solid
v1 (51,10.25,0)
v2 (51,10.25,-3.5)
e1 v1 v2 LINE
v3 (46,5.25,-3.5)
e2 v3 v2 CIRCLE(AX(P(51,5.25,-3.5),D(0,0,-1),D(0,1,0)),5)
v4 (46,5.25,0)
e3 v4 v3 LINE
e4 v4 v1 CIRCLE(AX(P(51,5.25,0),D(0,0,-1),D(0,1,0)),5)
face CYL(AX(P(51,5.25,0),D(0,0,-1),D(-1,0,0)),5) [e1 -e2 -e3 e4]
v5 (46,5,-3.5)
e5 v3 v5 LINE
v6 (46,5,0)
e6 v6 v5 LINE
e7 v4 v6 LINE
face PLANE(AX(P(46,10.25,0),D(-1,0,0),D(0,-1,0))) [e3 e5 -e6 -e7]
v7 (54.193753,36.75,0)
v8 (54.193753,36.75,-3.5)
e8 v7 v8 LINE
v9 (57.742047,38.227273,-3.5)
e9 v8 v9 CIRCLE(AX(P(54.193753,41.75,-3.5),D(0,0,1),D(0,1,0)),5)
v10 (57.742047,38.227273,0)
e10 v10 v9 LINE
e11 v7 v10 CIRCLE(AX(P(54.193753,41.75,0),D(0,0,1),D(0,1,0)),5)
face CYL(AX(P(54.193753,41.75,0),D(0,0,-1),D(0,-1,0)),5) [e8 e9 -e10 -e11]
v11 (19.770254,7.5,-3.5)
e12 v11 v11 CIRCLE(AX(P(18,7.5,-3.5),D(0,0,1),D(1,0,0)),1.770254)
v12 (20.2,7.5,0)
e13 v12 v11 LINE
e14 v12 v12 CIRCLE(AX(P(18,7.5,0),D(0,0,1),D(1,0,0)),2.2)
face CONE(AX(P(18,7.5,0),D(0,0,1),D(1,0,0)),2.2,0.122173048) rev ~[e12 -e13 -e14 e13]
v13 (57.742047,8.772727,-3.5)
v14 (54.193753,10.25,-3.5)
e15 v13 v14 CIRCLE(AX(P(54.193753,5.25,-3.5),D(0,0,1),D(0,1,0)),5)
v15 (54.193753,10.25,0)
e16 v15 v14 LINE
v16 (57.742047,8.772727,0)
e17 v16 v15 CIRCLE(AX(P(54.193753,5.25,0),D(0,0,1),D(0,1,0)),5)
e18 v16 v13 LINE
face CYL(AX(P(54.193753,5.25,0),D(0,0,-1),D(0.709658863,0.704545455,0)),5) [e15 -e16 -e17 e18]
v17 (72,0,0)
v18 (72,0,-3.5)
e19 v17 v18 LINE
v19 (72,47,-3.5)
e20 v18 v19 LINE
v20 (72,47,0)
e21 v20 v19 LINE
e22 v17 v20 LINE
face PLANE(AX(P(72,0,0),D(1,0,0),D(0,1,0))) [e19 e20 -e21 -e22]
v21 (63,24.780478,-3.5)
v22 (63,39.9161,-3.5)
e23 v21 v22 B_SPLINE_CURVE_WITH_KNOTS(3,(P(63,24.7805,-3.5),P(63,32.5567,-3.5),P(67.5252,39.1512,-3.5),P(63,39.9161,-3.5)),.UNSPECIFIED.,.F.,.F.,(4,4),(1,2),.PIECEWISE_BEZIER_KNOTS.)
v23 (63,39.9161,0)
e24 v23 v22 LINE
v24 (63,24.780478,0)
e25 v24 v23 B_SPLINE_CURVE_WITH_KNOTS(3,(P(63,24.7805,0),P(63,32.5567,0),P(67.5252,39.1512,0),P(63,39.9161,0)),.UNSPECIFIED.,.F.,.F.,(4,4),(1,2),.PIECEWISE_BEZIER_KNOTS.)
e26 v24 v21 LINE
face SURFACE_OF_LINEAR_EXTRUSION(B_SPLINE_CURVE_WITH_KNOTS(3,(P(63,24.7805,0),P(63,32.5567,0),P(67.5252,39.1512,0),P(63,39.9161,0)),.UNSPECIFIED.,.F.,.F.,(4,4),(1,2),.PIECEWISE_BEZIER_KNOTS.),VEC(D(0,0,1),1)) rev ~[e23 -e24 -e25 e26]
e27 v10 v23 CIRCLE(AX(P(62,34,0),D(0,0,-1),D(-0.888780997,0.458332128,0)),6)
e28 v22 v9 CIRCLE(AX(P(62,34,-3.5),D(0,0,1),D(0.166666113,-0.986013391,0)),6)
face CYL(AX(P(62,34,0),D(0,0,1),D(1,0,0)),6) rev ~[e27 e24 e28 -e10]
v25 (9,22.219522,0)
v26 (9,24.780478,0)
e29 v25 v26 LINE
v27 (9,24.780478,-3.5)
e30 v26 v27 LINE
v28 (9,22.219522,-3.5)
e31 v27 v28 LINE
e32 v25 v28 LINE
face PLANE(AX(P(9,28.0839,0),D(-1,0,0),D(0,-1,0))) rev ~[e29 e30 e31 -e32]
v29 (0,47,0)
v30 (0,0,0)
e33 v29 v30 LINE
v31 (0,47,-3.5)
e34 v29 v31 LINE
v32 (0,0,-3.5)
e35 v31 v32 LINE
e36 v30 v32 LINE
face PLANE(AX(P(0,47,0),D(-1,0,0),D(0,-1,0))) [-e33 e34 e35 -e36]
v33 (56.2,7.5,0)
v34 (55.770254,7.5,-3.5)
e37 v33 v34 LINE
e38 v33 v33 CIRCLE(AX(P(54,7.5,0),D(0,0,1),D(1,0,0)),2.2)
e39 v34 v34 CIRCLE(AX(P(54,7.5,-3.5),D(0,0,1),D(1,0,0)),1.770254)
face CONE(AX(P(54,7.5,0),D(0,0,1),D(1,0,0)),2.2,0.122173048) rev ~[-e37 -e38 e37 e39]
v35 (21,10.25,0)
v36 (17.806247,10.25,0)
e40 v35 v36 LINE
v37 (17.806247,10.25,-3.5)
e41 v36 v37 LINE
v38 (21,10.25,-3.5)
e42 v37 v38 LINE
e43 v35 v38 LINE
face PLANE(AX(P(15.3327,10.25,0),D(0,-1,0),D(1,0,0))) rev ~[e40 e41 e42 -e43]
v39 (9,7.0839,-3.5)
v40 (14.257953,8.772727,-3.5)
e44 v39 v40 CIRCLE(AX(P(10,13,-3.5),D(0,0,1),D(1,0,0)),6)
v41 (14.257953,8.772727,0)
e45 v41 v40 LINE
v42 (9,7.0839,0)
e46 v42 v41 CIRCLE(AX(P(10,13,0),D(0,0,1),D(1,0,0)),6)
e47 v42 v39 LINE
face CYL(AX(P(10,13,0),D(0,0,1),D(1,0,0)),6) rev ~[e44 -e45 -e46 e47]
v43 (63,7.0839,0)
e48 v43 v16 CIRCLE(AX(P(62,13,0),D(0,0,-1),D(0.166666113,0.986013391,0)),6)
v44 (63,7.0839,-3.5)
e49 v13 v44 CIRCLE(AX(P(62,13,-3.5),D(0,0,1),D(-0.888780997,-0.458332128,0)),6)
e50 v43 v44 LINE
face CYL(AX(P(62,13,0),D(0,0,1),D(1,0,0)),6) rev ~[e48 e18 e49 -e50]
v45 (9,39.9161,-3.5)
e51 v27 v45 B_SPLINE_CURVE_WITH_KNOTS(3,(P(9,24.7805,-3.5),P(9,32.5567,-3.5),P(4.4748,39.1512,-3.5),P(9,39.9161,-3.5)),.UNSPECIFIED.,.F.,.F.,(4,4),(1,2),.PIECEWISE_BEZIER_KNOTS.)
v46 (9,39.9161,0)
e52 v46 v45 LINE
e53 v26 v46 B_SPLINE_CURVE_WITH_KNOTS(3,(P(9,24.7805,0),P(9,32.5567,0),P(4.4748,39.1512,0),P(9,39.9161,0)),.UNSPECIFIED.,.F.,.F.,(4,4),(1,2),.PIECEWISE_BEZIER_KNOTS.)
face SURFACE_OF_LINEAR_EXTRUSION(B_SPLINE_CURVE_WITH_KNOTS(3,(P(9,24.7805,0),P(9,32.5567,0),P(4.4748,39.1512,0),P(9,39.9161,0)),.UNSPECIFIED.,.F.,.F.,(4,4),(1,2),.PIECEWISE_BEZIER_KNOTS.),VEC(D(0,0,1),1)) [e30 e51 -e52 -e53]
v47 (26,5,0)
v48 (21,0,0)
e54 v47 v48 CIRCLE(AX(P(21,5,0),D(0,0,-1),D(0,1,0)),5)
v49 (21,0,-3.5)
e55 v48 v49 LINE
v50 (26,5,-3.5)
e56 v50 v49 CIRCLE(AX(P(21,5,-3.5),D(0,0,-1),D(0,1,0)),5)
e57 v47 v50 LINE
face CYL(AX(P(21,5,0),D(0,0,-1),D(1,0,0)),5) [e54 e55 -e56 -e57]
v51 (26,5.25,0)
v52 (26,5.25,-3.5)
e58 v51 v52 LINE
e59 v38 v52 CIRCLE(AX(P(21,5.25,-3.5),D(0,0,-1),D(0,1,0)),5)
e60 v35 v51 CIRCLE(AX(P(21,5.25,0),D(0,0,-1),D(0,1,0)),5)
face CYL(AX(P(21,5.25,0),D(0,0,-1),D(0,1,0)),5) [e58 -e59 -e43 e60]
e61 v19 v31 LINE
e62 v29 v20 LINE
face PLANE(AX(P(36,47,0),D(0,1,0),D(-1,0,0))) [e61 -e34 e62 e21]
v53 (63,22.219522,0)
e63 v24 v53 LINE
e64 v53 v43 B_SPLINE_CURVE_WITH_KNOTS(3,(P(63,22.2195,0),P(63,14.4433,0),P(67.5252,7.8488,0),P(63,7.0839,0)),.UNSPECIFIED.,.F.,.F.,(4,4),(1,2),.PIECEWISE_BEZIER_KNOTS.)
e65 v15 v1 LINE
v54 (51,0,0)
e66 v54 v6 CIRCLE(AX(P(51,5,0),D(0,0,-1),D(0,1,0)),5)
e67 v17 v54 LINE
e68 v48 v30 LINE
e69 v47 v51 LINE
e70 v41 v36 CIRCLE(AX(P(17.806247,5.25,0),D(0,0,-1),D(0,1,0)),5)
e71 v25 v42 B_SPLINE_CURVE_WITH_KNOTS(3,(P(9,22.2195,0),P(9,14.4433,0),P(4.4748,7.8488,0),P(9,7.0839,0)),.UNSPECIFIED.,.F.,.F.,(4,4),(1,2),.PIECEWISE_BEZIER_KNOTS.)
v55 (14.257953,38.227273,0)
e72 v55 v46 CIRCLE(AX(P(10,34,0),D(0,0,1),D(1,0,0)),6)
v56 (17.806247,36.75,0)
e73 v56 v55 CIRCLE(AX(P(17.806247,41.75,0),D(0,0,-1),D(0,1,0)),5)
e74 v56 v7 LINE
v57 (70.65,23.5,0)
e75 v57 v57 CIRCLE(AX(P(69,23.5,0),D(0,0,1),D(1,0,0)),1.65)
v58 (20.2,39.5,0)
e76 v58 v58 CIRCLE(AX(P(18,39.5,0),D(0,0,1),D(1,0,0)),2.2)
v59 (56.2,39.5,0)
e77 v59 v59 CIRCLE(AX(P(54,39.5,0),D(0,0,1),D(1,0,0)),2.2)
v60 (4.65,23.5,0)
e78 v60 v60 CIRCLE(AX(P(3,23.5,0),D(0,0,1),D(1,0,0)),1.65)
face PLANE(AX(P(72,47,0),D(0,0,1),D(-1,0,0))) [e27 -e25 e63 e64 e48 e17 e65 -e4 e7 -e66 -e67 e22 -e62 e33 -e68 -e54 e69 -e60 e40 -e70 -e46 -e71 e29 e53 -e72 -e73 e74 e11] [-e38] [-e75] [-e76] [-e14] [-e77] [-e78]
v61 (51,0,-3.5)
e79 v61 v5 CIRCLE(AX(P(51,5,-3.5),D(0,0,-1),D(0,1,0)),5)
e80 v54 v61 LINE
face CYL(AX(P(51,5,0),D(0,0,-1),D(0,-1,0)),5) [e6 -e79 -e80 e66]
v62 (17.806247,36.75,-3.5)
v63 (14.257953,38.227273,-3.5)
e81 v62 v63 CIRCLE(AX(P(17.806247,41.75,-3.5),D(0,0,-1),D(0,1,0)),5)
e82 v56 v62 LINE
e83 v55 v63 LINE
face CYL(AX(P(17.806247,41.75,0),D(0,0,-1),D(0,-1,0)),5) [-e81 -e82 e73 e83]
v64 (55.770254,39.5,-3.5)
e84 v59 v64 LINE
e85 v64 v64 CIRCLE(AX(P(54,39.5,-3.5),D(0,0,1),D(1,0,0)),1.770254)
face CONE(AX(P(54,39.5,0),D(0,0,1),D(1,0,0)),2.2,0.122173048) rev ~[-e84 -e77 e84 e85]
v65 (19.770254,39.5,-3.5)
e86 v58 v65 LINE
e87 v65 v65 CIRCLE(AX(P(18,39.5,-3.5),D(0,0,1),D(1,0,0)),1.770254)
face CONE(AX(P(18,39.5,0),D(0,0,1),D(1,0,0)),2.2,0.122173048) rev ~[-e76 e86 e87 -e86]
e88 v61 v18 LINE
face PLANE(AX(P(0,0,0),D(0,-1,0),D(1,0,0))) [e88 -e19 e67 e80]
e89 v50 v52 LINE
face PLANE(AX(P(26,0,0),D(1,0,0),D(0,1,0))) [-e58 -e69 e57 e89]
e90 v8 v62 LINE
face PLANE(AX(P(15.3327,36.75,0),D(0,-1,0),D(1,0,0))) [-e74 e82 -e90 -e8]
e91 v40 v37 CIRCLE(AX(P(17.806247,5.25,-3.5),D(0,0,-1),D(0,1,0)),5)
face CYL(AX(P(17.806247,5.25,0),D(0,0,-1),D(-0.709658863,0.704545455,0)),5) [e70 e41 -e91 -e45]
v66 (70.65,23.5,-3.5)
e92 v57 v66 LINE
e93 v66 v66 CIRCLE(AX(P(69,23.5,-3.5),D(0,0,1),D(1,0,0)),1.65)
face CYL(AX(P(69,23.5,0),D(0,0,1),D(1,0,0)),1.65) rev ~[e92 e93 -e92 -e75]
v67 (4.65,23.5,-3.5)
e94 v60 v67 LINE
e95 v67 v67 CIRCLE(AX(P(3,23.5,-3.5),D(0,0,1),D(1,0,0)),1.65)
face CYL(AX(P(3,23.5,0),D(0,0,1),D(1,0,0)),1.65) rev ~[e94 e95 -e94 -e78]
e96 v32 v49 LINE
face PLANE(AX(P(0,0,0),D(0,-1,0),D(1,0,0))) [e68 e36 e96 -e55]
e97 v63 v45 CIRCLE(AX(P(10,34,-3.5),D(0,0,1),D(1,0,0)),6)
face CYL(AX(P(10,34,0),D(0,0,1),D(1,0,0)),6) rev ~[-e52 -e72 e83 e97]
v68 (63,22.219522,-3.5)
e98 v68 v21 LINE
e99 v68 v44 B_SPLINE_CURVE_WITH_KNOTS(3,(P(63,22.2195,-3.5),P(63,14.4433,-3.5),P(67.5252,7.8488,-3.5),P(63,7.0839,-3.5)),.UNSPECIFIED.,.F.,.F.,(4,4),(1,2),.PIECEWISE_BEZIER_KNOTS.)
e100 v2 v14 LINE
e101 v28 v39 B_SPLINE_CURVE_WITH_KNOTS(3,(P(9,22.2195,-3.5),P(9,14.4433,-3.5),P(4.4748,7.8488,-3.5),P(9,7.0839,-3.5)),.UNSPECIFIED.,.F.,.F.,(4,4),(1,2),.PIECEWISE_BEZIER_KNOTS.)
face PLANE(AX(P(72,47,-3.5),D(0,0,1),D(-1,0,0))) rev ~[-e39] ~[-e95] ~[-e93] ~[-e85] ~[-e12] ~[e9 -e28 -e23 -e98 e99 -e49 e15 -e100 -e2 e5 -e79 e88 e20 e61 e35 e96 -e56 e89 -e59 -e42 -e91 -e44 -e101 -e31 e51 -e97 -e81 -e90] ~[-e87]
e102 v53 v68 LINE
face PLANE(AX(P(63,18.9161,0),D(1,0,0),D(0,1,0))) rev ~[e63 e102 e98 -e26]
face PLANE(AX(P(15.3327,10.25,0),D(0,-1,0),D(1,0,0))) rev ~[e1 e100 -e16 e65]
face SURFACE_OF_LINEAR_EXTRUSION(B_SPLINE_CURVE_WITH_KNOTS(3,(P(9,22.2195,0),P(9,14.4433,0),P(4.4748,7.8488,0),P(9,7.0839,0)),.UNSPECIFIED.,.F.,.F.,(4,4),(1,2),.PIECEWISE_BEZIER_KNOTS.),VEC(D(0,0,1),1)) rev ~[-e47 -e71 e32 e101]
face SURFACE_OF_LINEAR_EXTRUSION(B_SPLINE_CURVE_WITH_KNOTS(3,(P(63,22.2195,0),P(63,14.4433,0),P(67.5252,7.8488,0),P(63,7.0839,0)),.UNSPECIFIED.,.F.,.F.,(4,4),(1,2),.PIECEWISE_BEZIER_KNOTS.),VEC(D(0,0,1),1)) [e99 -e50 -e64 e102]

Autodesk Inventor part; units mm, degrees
ref_plane "XY Plane" through (0, 0, 0) normal (0, 0, 1) x (1, 0, 0)
sketch "Sketch1" plane through (0, 0, 0) normal (0, 0, 1) x (1, 0, 0)
  line L0 (0, 0) -> (72, 0)
  line L1 (72, 0) -> (72, 47)
  line L2 (72, 47) -> (0, 47)
  line L3 (0, 47) -> (0, 0)
  circle A0 centre (3, 23.5) radius 1.65
  circle A1 centre (69, 23.5) radius 1.65
  line L4 (0, 23.5) -> (72, 23.5) construction
  circle A2 centre (18, 39.5) radius 2.2
  circle A3 centre (54, 39.5) radius 2.2
  circle A4 centre (54, 7.5) radius 2.2
  circle A5 centre (18, 7.5) radius 2.2
  line L5 (18, 39.5) -> (18, 7.5) construction
  line L6 (18, 7.5) -> (54, 7.5) construction
  line L7 (54, 7.5) -> (54, 39.5) construction
  line L8 (54, 39.5) -> (18, 39.5) construction
  line L9 (3.1536, 51.5748) -> (75.0735, 51.5748) construction
  line L10 (75.0735, 51.5748) -> (75.0735, -9.0389) construction
  line L11 (75.0735, -9.0389) -> (3.1536, -9.0389) construction
  line L12 (3.1536, -9.0389) -> (3.1536, 51.5748) construction
  circle A6 centre (10, 34) radius 6
  line L13 (36, 0) -> (36, 47)
  line L14 (9, 28.0839) -> (9, 23.5)
  line L15 (15.3327, 36.75) -> (36, 36.75)
  circle A7 centre (62, 34) radius 6
  line L16 (63, 28.0839) -> (63, 23.5)
  line L17 (56.6673, 36.75) -> (36, 36.75)
  circle A8 centre (10, 13) radius 6
  line L18 (9, 18.9161) -> (9, 23.5)
  line L19 (15.3327, 10.25) -> (36, 10.25)
  circle A9 centre (62, 13) radius 6
  line L20 (56.6673, 10.25) -> (36, 10.25)
  line L21 (63, 18.9161) -> (63, 23.5)
  line L22 (26, 10.25) -> (46, 10.25)
  line L23 (46, 10.25) -> (46, 0)
  line L24 (46, 0) -> (26, 0)
  line L25 (26, 0) -> (26, 10.25)
  point P0 (36, 39.5)
  point P1 (54, 23.5)
  dimension "d0" = 72
  dimension "d1" = 47
  dimension "d2" = 3.3
  dimension "d3" = 3.3
  dimension "d4" = 66
  dimension "d5" = 3
  dimension "d6" = 36
  dimension "d7" = 32
  dimension "d8" = 36
  dimension "d9" = 4.4
  dimension "d10" = 4.4
  dimension "d11" = 4.4
  dimension "d12" = 4.4
  dimension "d32" = 12
  dimension "d33" = 10
  dimension "d34" = 13
  dimension "d35" = 9
  dimension "d36" = 10.25
  dimension "d44" = 10
  dimension "d45" = 10
extrude "Extrusion1" add sketch "Sketch1" against normal blind 3.5 contours L3 L2 L13 L15 A6 L14 L18 A8 L19 L25 L0 | L25 L19 L13 L0 | L13 L20 L23 L0 | L2 L1 L0 L23 L20 A9 L21 L16 A7 L17 L13 | A2 | A3 | A4 | A5
extrude "Extrusion2" cut sketch "Sketch1" against normal through all draft -7 contours A2 | A3 | A4 | A5
fillet "Fillet1" radius 5 8 edges at (9, 18.9161, -1.75) (9, 28.0839, -1.75) (15.3327, 36.75, -1.75) (56.6673, 36.75, -1.75) (63, 18.9161, -1.75) (56.6673, 10.25, -1.75) (15.3327, 10.25, -1.75) (63, 28.0839, -1.75)
extrude "Extrusion3" cut sketch "Sketch1" against normal through all contours L25 L19 L13 L0 | L13 L20 L23 L0
fillet "Fillet2" radius 5 4 edges at (26, 10.25, -1.75) (46, 10.25, -1.75) (26, 0, -1.75) (46, 0, -1.75)
sketch "Sketch2" plane through (0, 0, 0) normal (0, 0, 1) x (1, 0, 0)
  arc A0 (6.7273, 18.0288) -> (9, 22.2195) centre (4, 22.2195) ccw projected
  arc A1 (6.7273, 18.0288) -> (14.258, 8.7727) centre (10, 13) ccw projected
  line L0 (9, 22.2195) -> (9, 24.7805) projected
  arc A2 (6.7273, 18.0288) -> (9, 22.2195) centre (4, 22.2195) ccw projected
  line L1 (9, 22.2195) -> (9, 14.4433) construction
  line L2 (9, 14.4433) -> (4.4748, 7.8488) construction
  arc A3 (6.7273, 18.0288) -> (14.258, 8.7727) centre (10, 13) ccw projected
  line L3 (4.4748, 7.8488) -> (9, 7.0839) construction
  spline S0 degree 3 poles (9, 22.2195) (9, 14.4433) (4.4748, 7.8488) (9, 7.0839) knots 1 1 1 1 2 2 2 2
  point P0 (0, 0)
  point P1 (8.9999, 7.0839)
  dimension "d50" = 1
extrude "Extrusion4" add sketch "Sketch2" against normal up to surface (3.5 mm away)
ref_plane "Work Plane1" through (3, 23.5, 0) normal (0, 1, 0) x (-1, 0, 0)
mirror "Mirror1" about plane through (3, 23.5, 0) normal (0, 1, 0) of "Extrusion4"
ref_plane "Work Plane2" through (36, 10.25, 0) normal (1, 0, 0) x (0, 1, 0)
mirror "Mirror2" about plane through (36, 10.25, 0) normal (1, 0, 0) of "Extrusion4", "Mirror1"
equation "\"d8\" = 0.5 * d0"
equation "\"d10\" = d9"
equation "\"d11\" = d9"
equation "\"d12\" = d9"
properties part number "lidar_mount_frame_lidar_lite_v3hp"
